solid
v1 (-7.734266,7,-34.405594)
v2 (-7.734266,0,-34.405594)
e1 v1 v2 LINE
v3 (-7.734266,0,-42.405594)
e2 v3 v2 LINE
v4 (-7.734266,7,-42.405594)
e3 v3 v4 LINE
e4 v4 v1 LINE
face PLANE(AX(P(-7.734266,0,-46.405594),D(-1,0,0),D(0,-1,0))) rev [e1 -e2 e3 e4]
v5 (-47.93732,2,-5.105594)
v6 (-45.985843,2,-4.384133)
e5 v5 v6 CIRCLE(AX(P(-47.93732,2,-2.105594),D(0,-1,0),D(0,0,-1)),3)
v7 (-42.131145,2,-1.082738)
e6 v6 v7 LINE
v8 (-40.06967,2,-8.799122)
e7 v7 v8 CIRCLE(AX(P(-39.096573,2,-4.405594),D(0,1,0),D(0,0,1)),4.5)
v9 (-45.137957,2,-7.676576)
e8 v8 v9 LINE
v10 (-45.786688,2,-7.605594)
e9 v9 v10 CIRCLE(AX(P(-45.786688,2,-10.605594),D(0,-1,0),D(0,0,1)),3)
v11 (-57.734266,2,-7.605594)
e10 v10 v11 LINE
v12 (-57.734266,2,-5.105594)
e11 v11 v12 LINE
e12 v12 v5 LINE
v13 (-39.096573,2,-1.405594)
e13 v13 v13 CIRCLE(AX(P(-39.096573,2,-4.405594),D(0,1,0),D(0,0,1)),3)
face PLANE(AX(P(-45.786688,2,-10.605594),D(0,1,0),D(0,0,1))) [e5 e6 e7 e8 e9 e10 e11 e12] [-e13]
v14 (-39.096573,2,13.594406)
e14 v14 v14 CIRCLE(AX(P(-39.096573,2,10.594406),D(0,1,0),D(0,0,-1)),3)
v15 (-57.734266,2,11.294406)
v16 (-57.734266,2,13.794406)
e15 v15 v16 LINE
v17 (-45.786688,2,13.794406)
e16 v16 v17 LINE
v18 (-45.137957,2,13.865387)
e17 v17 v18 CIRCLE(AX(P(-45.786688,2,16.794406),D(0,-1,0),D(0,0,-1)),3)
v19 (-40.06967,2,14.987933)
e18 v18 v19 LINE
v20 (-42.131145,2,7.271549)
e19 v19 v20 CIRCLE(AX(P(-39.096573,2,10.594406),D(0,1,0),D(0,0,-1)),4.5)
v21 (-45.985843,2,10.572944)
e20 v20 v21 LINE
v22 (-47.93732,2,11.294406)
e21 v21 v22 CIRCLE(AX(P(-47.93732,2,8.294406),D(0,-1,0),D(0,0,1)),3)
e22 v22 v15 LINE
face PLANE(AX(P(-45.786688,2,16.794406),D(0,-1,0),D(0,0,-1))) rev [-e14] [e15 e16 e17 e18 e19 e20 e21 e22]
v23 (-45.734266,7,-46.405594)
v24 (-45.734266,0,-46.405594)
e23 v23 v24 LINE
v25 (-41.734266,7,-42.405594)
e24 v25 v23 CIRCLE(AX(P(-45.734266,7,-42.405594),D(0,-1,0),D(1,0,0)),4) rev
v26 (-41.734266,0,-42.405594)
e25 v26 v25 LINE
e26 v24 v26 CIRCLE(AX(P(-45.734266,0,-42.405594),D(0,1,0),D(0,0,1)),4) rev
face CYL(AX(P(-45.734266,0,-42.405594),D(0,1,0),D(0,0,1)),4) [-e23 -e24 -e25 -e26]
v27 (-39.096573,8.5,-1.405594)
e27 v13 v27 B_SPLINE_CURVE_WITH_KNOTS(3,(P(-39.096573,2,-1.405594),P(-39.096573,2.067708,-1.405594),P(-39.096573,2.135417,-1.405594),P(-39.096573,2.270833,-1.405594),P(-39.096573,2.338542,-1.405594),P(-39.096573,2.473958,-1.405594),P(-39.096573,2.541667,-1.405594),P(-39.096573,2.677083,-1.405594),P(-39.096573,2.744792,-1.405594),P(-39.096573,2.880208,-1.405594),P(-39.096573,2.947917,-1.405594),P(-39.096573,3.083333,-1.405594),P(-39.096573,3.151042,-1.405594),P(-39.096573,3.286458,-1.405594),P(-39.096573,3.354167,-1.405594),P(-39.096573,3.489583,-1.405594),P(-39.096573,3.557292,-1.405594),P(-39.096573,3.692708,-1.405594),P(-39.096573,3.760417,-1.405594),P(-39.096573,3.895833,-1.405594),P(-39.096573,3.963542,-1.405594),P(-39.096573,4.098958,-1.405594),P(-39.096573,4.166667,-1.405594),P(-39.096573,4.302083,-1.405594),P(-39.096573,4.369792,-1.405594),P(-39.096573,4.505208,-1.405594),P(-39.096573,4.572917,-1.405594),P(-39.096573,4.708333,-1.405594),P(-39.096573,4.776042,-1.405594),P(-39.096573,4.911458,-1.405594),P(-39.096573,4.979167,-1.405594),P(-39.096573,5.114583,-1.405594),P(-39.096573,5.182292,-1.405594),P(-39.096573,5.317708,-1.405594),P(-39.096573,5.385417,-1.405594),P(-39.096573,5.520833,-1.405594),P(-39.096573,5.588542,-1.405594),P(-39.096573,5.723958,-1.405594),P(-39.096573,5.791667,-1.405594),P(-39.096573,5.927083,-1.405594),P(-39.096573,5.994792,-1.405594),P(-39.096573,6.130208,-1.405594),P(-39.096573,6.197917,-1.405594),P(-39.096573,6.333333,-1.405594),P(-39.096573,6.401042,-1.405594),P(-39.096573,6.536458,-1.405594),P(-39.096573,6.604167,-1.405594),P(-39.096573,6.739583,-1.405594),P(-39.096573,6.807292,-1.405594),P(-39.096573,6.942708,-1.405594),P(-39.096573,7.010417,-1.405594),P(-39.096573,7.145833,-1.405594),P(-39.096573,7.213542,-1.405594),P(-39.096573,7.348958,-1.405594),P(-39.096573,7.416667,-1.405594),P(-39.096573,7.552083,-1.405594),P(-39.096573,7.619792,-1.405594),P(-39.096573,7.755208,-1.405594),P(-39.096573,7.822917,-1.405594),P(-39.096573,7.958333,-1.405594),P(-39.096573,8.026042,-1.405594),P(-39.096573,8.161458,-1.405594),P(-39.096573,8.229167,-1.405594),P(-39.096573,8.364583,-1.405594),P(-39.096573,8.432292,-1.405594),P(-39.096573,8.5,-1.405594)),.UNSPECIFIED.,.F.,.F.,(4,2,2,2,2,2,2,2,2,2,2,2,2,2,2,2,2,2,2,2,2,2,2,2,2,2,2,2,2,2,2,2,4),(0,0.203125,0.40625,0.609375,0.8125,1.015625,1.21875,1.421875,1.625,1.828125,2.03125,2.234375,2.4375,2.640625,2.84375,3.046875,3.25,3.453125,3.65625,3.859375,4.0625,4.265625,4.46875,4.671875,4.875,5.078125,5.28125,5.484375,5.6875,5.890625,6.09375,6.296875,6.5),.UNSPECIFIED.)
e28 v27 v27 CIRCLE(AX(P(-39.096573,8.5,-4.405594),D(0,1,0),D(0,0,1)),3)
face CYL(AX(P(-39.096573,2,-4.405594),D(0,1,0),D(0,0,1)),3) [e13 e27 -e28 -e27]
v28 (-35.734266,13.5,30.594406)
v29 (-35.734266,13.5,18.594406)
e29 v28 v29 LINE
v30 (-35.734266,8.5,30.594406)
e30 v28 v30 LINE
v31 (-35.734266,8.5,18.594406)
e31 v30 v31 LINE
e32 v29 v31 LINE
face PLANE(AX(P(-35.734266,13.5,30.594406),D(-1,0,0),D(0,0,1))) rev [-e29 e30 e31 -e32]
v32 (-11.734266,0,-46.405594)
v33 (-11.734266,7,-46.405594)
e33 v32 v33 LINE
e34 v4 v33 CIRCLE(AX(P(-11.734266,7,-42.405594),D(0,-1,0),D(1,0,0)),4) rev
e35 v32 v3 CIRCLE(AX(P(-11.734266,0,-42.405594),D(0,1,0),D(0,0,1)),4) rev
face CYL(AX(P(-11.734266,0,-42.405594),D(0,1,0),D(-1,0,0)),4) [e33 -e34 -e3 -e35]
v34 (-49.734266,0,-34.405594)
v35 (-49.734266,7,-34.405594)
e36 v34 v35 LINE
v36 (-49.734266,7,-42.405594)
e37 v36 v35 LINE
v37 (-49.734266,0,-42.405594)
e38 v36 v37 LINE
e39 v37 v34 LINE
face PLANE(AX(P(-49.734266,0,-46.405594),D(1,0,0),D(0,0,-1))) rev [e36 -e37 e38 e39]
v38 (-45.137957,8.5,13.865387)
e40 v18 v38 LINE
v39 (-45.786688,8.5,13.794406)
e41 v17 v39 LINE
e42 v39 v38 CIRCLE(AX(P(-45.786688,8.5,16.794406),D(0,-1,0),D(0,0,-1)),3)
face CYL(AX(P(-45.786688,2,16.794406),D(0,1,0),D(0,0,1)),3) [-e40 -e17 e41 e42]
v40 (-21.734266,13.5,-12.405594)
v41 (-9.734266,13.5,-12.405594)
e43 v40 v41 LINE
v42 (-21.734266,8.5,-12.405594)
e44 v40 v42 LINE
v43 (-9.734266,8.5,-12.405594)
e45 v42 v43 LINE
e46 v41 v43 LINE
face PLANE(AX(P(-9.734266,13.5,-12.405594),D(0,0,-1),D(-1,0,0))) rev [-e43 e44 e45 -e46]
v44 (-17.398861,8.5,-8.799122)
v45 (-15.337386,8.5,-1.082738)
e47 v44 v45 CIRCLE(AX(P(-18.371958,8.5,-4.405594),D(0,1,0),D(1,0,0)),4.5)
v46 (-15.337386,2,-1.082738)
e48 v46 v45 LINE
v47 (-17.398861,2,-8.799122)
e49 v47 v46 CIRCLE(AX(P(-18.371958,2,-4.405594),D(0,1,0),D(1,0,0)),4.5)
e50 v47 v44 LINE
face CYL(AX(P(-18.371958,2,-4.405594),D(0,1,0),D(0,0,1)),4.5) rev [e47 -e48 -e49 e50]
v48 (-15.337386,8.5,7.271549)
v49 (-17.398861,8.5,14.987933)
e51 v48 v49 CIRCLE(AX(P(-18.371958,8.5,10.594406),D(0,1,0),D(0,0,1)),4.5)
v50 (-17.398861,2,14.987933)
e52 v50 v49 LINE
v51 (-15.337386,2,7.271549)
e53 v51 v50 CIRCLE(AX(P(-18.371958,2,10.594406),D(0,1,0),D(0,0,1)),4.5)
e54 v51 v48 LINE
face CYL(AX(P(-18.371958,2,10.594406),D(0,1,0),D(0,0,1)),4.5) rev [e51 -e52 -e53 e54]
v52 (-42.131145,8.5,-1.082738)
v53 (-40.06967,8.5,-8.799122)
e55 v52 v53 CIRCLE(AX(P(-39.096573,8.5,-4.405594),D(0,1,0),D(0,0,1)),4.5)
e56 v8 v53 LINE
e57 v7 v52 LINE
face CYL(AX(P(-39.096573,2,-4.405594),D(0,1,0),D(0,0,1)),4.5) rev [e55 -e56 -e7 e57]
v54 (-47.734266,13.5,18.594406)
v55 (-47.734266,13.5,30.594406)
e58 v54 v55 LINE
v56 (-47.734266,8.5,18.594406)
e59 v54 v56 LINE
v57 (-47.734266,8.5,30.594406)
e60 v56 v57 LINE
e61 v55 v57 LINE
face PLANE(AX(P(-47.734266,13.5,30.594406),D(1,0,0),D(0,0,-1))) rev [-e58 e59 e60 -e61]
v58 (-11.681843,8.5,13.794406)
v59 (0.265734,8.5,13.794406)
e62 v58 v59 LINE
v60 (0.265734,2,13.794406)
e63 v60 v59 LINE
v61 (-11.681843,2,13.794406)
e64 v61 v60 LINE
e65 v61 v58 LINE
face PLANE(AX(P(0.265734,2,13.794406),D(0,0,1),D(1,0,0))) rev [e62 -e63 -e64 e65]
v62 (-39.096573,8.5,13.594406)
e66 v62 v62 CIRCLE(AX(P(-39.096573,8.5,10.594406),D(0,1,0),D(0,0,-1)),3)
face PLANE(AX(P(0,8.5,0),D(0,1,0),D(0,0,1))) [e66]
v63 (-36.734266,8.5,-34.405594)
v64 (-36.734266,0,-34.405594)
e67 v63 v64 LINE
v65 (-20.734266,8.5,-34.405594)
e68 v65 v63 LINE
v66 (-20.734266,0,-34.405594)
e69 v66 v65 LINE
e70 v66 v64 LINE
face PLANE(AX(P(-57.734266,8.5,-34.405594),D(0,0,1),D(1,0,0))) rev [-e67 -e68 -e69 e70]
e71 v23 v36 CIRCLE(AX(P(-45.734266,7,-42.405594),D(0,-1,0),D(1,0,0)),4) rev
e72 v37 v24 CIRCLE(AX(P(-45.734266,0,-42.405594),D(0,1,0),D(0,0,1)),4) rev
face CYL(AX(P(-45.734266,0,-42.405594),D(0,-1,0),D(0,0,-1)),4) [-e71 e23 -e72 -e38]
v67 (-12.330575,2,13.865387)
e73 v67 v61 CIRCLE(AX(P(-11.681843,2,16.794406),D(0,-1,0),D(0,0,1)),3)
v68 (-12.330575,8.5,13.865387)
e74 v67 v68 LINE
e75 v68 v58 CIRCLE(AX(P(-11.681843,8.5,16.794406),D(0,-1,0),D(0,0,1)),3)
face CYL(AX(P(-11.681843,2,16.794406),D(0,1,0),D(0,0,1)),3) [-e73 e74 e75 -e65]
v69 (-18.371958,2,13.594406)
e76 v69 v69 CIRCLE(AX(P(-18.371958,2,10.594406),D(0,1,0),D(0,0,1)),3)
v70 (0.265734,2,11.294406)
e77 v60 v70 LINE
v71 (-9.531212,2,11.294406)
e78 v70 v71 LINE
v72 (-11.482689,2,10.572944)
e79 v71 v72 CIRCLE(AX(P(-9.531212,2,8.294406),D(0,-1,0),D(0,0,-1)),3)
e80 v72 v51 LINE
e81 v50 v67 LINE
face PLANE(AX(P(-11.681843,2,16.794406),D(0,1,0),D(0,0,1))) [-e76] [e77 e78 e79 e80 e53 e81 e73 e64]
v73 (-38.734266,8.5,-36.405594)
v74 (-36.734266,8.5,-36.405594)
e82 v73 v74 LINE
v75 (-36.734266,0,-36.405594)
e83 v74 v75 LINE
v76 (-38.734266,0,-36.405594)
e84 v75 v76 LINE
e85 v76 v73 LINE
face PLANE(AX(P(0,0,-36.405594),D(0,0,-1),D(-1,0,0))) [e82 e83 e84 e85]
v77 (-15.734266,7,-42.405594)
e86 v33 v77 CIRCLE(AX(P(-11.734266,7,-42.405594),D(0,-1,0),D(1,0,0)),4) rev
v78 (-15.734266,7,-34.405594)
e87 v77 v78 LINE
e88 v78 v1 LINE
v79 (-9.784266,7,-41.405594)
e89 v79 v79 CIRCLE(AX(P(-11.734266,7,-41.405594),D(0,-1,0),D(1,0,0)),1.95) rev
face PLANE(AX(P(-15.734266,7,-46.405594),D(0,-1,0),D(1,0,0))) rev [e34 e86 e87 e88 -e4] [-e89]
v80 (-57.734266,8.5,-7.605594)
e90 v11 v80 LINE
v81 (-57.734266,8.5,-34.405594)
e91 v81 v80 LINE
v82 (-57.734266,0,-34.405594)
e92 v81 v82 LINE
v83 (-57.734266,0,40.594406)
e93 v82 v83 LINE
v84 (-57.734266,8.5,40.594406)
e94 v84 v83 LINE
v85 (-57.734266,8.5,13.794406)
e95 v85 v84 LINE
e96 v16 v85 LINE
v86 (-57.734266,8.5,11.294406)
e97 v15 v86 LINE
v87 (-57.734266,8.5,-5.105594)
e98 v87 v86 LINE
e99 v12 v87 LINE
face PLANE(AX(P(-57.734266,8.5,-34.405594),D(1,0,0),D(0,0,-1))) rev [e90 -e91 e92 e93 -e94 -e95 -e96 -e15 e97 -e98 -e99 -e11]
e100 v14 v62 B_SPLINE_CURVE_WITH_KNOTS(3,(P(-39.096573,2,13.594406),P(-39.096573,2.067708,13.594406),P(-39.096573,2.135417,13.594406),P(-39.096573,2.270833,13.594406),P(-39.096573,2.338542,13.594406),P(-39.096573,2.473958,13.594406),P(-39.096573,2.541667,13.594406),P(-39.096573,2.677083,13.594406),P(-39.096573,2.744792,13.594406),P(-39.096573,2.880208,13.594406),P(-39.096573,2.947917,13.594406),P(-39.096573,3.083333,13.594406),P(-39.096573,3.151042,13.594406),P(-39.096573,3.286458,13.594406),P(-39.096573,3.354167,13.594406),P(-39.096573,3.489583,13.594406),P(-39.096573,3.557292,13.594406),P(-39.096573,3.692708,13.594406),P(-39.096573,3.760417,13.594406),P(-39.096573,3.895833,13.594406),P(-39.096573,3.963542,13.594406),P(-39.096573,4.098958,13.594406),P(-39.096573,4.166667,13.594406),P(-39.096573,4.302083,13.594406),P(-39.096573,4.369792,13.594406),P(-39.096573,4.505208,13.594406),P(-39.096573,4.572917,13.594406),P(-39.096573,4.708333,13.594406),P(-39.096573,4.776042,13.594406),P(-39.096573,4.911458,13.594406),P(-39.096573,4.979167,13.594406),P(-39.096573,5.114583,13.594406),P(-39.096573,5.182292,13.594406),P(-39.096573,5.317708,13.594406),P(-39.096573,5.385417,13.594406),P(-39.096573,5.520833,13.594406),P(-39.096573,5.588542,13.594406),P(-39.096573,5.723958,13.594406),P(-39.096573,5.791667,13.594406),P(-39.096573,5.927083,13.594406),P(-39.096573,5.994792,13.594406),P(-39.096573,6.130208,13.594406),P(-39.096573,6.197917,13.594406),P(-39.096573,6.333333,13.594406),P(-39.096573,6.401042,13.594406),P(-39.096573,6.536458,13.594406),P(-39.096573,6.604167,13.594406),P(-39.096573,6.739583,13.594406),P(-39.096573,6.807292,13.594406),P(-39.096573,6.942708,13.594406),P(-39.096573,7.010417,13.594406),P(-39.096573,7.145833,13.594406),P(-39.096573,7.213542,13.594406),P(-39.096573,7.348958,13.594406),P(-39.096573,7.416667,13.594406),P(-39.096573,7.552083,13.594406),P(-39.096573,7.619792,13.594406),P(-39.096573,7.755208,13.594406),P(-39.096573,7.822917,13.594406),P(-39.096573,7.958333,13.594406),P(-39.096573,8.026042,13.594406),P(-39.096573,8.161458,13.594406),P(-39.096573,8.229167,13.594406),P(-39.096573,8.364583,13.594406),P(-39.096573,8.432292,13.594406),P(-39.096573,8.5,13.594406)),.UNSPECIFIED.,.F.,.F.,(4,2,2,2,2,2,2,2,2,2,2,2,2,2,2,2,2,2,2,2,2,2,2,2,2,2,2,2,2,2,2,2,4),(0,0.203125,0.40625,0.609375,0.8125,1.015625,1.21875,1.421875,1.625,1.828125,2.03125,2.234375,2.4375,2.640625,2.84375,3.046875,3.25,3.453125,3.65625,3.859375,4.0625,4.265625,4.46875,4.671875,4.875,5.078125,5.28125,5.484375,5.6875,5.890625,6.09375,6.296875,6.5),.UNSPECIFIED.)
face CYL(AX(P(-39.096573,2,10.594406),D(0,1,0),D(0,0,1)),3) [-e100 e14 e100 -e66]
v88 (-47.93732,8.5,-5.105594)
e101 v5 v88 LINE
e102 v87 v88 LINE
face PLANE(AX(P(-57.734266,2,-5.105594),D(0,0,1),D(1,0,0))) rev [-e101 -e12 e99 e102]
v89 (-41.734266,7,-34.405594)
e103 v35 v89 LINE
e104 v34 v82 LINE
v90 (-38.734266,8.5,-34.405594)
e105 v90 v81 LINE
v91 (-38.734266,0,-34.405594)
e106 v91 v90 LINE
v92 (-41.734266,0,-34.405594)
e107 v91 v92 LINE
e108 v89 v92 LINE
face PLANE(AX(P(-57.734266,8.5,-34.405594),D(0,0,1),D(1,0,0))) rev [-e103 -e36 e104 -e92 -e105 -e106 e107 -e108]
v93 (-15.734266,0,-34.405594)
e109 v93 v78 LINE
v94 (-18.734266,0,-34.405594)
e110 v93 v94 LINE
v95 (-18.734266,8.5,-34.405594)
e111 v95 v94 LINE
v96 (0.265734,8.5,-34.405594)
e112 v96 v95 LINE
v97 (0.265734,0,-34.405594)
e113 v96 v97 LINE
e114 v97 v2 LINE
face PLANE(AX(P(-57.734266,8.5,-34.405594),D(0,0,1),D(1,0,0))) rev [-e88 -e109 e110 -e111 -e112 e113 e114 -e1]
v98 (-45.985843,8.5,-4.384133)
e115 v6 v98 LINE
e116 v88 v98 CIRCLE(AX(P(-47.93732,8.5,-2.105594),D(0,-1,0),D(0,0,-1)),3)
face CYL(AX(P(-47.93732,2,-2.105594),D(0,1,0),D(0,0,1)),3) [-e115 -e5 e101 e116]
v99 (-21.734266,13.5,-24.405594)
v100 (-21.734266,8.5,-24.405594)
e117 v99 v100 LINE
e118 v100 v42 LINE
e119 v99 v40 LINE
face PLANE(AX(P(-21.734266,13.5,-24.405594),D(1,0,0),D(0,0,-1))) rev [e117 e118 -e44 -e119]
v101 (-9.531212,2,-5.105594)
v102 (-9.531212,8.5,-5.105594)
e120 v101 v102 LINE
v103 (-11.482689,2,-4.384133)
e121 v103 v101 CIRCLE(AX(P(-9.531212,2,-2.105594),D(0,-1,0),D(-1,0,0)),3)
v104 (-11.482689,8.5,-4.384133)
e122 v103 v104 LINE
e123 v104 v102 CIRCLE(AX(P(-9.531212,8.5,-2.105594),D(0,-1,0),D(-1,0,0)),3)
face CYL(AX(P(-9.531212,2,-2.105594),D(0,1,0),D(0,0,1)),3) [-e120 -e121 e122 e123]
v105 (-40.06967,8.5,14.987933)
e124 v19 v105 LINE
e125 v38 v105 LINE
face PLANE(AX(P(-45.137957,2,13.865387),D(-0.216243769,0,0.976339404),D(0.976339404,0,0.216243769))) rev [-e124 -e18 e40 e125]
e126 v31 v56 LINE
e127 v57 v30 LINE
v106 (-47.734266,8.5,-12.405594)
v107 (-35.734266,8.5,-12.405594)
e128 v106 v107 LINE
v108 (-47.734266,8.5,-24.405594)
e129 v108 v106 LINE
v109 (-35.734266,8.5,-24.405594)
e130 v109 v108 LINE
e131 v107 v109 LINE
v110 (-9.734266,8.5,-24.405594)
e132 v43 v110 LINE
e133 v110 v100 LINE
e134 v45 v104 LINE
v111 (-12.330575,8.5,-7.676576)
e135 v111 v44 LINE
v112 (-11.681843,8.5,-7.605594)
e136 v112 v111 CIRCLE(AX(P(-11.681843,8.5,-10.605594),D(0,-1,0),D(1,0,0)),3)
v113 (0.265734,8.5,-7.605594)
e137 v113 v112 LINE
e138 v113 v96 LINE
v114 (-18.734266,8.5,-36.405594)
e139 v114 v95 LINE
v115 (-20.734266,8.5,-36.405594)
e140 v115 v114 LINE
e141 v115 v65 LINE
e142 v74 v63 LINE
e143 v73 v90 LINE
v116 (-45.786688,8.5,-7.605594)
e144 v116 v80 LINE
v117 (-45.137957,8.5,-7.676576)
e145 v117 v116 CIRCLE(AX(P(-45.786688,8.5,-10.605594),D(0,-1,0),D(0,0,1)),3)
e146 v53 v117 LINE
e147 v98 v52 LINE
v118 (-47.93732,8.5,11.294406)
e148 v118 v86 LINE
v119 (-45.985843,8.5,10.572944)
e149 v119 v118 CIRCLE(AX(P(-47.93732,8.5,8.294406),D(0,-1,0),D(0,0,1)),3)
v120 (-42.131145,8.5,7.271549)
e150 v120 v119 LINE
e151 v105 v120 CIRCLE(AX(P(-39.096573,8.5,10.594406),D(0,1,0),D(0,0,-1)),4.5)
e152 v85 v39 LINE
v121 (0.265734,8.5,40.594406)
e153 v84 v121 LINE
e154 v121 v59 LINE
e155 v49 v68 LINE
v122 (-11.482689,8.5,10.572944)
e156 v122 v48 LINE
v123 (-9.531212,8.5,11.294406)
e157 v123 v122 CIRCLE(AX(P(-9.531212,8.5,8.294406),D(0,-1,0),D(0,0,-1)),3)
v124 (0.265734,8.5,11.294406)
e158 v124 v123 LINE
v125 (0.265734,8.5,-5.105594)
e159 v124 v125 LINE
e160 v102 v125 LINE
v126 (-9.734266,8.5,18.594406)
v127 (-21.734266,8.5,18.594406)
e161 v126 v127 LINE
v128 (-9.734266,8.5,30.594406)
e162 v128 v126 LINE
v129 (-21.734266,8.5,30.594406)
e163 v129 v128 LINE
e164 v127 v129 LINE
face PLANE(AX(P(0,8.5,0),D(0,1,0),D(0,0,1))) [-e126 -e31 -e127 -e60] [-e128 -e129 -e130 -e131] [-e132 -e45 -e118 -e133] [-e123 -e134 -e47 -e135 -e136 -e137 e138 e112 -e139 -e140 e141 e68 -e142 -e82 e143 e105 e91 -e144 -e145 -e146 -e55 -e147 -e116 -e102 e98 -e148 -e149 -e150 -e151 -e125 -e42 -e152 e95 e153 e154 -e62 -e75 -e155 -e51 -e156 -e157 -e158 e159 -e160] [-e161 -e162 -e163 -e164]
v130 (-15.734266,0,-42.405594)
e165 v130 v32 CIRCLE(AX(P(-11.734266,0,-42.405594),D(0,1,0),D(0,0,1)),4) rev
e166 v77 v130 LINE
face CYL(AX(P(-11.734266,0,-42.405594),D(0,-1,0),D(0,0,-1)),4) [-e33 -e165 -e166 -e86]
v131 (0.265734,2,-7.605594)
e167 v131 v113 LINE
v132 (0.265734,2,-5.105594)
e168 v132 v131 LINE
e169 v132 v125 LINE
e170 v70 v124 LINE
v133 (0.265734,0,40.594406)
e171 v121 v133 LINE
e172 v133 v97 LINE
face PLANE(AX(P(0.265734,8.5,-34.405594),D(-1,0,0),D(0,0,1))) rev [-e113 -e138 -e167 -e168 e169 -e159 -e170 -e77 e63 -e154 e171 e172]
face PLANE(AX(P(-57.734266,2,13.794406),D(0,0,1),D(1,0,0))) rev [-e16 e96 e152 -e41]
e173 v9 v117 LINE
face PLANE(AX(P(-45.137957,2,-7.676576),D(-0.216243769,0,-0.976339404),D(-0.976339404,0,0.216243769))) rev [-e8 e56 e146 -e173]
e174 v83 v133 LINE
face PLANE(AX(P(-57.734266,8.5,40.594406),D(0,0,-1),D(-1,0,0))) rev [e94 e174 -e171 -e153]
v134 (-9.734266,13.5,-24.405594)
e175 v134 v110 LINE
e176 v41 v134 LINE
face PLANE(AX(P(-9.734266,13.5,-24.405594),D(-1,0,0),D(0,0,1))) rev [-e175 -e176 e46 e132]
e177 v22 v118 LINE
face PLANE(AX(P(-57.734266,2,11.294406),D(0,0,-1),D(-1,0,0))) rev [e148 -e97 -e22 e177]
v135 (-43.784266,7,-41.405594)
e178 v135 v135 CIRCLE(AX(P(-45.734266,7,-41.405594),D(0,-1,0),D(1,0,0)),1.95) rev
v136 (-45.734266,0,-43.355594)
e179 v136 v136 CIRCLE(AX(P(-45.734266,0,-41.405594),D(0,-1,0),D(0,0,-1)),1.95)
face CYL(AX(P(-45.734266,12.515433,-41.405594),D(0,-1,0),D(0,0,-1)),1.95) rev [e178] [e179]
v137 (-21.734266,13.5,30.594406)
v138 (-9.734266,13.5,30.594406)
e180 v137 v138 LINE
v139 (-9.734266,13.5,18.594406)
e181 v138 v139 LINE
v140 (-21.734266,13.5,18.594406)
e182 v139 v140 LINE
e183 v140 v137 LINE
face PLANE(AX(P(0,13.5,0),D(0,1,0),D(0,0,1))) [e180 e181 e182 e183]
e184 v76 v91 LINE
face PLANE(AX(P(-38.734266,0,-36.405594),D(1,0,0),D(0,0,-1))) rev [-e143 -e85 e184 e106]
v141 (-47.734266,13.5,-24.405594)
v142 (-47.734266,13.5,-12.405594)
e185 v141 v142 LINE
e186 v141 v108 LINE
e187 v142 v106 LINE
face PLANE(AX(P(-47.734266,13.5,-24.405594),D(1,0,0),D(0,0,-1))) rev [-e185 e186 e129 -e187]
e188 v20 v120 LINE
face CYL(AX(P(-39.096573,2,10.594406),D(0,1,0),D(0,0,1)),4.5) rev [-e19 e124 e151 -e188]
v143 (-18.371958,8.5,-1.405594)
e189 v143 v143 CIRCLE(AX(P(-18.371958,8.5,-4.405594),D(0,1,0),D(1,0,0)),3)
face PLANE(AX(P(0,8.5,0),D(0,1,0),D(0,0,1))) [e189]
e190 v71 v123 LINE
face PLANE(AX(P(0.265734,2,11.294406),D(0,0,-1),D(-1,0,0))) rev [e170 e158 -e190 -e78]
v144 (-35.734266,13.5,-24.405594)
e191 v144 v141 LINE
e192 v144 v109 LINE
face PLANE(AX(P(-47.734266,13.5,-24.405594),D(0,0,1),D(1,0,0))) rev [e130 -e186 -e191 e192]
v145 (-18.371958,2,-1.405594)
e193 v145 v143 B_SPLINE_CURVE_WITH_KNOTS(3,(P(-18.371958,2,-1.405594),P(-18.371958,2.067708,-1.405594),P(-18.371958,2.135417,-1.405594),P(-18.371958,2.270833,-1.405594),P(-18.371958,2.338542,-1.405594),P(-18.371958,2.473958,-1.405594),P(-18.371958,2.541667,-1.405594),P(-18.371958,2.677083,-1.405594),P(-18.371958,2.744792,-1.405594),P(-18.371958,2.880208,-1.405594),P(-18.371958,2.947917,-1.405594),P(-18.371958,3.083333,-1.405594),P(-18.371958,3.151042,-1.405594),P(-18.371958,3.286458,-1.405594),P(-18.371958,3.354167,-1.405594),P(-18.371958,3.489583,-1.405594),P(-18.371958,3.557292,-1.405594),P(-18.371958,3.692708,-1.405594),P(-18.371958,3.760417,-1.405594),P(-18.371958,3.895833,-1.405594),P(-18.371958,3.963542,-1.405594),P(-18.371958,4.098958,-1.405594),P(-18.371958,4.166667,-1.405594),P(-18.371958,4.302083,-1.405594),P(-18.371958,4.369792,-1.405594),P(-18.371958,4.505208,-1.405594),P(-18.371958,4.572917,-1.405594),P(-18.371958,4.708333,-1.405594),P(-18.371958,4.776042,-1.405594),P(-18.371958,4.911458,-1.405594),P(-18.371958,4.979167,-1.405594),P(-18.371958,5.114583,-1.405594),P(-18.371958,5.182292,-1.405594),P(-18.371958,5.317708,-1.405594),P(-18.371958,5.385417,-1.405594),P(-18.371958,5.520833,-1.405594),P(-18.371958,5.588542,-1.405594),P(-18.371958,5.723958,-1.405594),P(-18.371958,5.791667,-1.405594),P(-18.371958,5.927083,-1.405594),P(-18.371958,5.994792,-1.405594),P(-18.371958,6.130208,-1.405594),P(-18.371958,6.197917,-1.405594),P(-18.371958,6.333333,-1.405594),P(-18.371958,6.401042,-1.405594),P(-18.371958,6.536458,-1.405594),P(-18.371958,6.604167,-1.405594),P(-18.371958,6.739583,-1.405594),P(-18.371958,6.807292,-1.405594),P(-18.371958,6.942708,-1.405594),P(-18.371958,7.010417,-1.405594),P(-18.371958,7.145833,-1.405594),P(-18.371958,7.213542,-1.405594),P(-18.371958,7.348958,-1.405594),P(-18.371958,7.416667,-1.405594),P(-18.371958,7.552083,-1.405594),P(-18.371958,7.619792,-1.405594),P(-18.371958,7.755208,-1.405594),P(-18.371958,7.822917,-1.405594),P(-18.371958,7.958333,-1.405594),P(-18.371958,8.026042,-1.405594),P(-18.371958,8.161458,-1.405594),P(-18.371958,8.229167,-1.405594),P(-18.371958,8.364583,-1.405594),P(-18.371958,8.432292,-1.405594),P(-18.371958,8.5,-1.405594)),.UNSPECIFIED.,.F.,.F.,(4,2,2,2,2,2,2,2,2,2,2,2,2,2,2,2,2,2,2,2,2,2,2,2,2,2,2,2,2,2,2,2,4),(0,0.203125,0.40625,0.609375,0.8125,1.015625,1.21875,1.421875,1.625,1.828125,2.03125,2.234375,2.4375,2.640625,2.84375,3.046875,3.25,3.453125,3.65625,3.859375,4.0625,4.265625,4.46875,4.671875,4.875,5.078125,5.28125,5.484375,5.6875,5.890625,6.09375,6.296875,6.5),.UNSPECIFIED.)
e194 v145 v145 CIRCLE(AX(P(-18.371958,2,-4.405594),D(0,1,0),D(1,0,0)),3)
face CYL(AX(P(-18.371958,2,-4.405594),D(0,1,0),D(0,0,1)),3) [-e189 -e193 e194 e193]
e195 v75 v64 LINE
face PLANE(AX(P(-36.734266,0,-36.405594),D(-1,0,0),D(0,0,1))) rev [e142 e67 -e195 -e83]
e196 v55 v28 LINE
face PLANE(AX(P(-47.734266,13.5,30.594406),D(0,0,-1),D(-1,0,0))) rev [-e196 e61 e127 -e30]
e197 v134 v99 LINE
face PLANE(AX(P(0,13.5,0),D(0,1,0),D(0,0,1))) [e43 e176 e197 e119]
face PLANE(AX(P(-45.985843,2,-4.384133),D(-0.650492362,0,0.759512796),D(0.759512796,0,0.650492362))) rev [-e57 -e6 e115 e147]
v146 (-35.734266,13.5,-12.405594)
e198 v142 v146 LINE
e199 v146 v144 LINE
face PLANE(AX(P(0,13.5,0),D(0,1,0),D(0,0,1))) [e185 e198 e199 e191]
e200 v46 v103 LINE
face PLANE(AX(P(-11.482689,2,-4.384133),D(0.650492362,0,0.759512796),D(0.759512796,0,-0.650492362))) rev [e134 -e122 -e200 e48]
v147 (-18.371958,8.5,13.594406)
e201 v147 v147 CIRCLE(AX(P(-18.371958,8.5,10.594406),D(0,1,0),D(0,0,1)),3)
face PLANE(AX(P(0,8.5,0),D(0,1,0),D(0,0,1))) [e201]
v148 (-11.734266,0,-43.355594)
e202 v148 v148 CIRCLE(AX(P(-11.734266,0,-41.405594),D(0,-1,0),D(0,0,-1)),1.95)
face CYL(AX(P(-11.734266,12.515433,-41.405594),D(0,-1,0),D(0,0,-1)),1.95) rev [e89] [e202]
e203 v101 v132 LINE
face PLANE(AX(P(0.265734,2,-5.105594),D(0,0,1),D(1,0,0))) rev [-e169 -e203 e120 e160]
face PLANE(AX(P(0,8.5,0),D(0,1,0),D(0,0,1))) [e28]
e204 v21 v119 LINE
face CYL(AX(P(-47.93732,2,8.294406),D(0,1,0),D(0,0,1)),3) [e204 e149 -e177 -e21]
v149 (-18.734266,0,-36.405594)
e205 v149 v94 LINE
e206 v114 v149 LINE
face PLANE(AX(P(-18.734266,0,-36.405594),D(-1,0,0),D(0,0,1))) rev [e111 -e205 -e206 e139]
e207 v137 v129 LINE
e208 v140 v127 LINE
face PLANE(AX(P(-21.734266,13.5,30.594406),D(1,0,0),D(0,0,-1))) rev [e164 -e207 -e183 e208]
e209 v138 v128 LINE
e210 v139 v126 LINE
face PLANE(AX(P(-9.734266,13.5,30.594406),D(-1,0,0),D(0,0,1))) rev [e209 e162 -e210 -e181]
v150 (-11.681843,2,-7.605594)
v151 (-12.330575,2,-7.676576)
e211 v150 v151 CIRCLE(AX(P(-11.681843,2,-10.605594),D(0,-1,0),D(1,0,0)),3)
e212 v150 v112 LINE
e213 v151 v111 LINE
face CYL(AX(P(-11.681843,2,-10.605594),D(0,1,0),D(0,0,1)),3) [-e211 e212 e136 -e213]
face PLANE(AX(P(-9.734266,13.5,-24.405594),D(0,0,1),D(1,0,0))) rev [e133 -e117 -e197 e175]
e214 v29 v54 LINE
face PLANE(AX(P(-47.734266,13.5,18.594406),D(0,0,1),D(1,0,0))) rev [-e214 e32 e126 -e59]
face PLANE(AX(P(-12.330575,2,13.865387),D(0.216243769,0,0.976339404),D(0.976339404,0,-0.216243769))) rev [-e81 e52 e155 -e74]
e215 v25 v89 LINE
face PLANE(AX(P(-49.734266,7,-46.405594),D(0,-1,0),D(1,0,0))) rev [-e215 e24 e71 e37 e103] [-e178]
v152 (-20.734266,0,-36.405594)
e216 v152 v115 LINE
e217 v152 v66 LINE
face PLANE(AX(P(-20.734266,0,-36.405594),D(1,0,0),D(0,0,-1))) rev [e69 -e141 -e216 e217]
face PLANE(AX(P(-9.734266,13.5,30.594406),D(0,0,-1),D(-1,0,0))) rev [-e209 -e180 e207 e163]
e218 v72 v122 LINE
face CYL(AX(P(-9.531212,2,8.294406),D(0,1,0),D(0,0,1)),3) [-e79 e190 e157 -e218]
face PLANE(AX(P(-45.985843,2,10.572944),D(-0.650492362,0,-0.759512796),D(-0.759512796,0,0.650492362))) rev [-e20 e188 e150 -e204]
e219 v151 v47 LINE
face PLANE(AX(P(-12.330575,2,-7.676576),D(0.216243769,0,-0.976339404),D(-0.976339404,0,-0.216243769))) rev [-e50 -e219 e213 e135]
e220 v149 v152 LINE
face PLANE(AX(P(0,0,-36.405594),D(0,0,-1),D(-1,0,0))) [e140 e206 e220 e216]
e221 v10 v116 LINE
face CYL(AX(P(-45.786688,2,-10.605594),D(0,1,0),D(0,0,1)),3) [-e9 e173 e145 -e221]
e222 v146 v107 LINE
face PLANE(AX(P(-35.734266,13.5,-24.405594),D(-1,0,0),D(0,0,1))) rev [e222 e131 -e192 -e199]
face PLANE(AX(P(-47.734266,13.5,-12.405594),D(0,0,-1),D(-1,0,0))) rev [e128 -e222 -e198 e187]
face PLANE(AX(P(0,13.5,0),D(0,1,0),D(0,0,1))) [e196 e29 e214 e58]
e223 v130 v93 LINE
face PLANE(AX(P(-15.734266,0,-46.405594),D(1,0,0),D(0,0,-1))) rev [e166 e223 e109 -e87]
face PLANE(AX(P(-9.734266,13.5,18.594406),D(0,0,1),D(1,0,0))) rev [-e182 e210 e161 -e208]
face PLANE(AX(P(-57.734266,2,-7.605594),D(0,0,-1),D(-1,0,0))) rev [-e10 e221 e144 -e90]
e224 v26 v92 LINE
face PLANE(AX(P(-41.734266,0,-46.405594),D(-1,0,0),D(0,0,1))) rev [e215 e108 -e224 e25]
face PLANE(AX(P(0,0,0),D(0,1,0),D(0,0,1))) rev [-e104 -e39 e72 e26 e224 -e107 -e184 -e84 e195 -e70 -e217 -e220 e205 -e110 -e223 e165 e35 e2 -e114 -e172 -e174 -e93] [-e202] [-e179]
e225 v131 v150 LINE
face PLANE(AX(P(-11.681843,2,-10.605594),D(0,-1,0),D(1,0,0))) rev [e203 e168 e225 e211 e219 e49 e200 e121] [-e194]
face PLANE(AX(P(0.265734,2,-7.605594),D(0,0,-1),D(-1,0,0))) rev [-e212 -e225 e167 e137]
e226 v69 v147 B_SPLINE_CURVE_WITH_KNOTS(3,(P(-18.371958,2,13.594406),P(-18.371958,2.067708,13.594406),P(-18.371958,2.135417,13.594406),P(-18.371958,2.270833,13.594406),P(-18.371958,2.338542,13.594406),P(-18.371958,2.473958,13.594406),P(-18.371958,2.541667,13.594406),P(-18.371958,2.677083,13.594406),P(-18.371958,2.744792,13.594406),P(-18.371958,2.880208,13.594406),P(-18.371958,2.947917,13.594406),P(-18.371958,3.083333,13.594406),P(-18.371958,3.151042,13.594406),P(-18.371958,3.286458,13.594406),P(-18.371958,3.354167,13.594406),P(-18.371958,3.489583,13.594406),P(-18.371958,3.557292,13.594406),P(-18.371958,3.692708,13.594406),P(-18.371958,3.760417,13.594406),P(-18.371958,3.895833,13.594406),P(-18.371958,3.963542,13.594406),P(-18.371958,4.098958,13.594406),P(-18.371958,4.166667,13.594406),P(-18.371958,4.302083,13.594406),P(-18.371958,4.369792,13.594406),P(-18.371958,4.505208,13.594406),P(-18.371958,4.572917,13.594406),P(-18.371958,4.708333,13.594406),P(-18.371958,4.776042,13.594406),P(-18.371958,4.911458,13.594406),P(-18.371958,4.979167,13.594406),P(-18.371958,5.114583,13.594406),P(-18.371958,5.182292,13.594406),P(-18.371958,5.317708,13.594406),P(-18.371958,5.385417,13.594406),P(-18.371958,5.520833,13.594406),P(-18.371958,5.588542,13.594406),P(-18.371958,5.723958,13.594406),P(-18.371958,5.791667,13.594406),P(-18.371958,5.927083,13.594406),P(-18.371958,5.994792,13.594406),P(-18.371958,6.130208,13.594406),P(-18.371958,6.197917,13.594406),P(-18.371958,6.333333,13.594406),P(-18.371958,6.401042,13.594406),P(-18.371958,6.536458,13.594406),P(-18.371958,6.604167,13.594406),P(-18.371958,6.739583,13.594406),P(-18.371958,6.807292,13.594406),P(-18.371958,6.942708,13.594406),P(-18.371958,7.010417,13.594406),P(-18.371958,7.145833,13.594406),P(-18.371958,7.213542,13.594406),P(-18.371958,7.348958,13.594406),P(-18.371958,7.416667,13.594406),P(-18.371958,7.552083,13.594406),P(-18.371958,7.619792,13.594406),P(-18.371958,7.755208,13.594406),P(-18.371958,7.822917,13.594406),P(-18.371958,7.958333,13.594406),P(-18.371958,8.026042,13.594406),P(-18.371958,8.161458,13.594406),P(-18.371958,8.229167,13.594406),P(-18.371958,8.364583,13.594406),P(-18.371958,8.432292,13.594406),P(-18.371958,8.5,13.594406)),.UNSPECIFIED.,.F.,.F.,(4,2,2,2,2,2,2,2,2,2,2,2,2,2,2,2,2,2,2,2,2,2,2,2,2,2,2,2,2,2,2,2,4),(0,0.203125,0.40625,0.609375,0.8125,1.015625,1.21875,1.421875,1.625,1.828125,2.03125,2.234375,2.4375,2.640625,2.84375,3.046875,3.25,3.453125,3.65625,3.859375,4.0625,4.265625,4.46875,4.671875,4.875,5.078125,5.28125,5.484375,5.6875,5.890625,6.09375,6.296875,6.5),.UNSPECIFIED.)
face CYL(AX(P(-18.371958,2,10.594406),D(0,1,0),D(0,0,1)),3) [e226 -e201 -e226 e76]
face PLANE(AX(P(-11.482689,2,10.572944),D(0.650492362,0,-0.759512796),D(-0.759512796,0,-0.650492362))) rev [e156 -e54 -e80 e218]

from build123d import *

# Parameters (mm, degrees)
SKETCH1_W           = 58
SKETCH1_H           = 75
BOSS_EXTRUDE1_DEPTH = 8.5
SKETCH4_R           = 3
CUT_EXTRUDE1_DEPTH  = 6.5
SKETCH5_W           = 12
SKETCH5_H           = 12
BOSS_EXTRUDE2_DEPTH = 5
SKETCH8_W           = 2
SKETCH8_H           = 8.5
BOSS_EXTRUDE3_DEPTH = 2
SKETCH7_W           = 8
SKETCH7_H           = 7
BOSS_EXTRUDE4_DEPTH = 12
SKETCH9_R           = 1.95
CUT_EXTRUDE2_DEPTH  = 7
FILLET1_R           = 4


with BuildPart() as part:
    # Sketch1 → Boss-Extrude1 (new body)
    with BuildSketch(Plane(origin=(0, 0, 0), x_dir=(1, 0, 0), z_dir=(0, 1, 0))):
        with Locations((-28.734265734, -3.094405594)):
            Rectangle(SKETCH1_W, SKETCH1_H)
    extrude(amount=BOSS_EXTRUDE1_DEPTH)

    # Sketch4 → Cut-Extrude1 (cut)
    # profile 1 of 4: a face of its own
    with BuildSketch(Plane(origin=(0, 8.5, 0), x_dir=(1, 0, 0), z_dir=(0, 1, 0))):
        with BuildLine():
            Line((-57.734265734, 7.605594406), (-57.734265734, 5.105594406))
            Line((-57.734265734, 5.105594406), (-47.937319909, 5.105594406))
            ThreePointArc((-47.937319909, 5.105594406), (-46.897035131, 4.919454313), (-45.985842823, 4.384132793))
            Line((-45.985842823, 4.384132793), (-42.13114507, 1.082738189))
            ThreePointArc((-42.13114507, 1.082738189), (-34.749045592, 3.244128144), (-40.069670138, 8.799121725))
            Line((-40.069670138, 8.799121725), (-45.137956932, 7.676576192))
            ThreePointArc((-45.137956932, 7.676576192), (-45.46038672, 7.623392649), (-45.786688237, 7.605594406))
            Line((-45.786688237, 7.605594406), (-57.734265734, 7.605594406))
        make_face()
        with Locations(Location((-39.096573179, 4.405594406, 0), (0, 0, 270))):
            Circle(SKETCH4_R, mode=Mode.SUBTRACT)
    # profile 2 of 4: a face of its own
    with BuildSketch(Plane(origin=(0, 8.5, 0), x_dir=(1, 0, 0), z_dir=(0, 1, 0))):
        with BuildLine():
            Line((-57.734265734, -13.794405594), (-57.734265734, -11.294405594))
            Line((-57.734265734, -11.294405594), (-47.937319909, -11.294405594))
            ThreePointArc((-47.937319909, -11.294405594), (-46.897035131, -11.108265502), (-45.985842823, -10.572943982))
            Line((-45.985842823, -10.572943982), (-42.13114507, -7.271549377))
            ThreePointArc((-42.13114507, -7.271549377), (-34.749045592, -9.432939333), (-40.069670138, -14.987932914))
            Line((-40.069670138, -14.987932914), (-45.137956932, -13.865387381))
            ThreePointArc((-45.137956932, -13.865387381), (-45.46038672, -13.812203837), (-45.786688237, -13.794405594))
            Line((-45.786688237, -13.794405594), (-57.734265734, -13.794405594))
        make_face()
        with Locations(Location((-39.096573179, -10.594405594, 0), (0, 0, 270))):
            Circle(SKETCH4_R, mode=Mode.SUBTRACT)
    # profile 3 of 4: a face of its own
    with BuildSketch(Plane(origin=(0, 8.5, 0), x_dir=(1, 0, 0), z_dir=(0, 1, 0))):
        with BuildLine():
            Line((0.265734266, -13.794405594), (0.265734266, -11.294405594))
            Line((0.265734266, -11.294405594), (-9.531211559, -11.294405594))
            ThreePointArc((-9.531211559, -11.294405594), (-10.571496337, -11.108265502), (-11.482688645, -10.572943982))
            Line((-11.482688645, -10.572943982), (-15.337386398, -7.271549377))
            ThreePointArc((-15.337386398, -7.271549377), (-22.719485877, -9.432939333), (-17.39886133, -14.987932914))
            Line((-17.39886133, -14.987932914), (-12.330574537, -13.865387381))
            ThreePointArc((-12.330574537, -13.865387381), (-12.008144749, -13.812203837), (-11.681843231, -13.794405594))
            Line((-11.681843231, -13.794405594), (0.265734266, -13.794405594))
        make_face()
        with Locations(Location((-18.371958289, -10.594405594, 0), (0, 0, 270))):
            Circle(SKETCH4_R, mode=Mode.SUBTRACT)
    # profile 4 of 4: a face of its own
    with BuildSketch(Plane(origin=(0, 8.5, 0), x_dir=(1, 0, 0), z_dir=(0, 1, 0))):
        with BuildLine():
            Line((0.265734266, 7.605594406), (0.265734266, 5.105594406))
            Line((0.265734266, 5.105594406), (-9.531211559, 5.105594406))
            ThreePointArc((-9.531211559, 5.105594406), (-10.571496337, 4.919454313), (-11.482688645, 4.384132793))
            Line((-11.482688645, 4.384132793), (-15.337386398, 1.082738189))
            ThreePointArc((-15.337386398, 1.082738189), (-22.719485877, 3.244128144), (-17.39886133, 8.799121725))
            Line((-17.39886133, 8.799121725), (-12.330574537, 7.676576192))
            ThreePointArc((-12.330574537, 7.676576192), (-12.008144749, 7.623392649), (-11.681843231, 7.605594406))
            Line((-11.681843231, 7.605594406), (0.265734266, 7.605594406))
        make_face()
        with Locations(Location((-18.371958289, 4.405594406, 0), (0, 0, 270))):
            Circle(SKETCH4_R, mode=Mode.SUBTRACT)
    extrude(amount=-CUT_EXTRUDE1_DEPTH, mode=Mode.SUBTRACT)

    # Sketch5 → Boss-Extrude2 (add)
    with BuildSketch(Plane(origin=(0, 8.5, 0), x_dir=(1, 0, 0), z_dir=(0, 1, 0))):
        with Locations((-41.734265734, 18.405594406)):
            Rectangle(SKETCH5_W, SKETCH5_H)
        with Locations((-15.734265734, 18.405594406)):
            Rectangle(SKETCH5_W, SKETCH5_H)
        with Locations((-15.734265734, -24.594405594)):
            Rectangle(SKETCH5_W, SKETCH5_H)
        with Locations((-41.734265734, -24.594405594)):
            Rectangle(SKETCH5_W, SKETCH5_H)
    extrude(amount=BOSS_EXTRUDE2_DEPTH)

    # Sketch8 → Boss-Extrude3 (add)
    with BuildSketch(Plane(origin=(0, 0, -34.405594406), x_dir=(-1, 0, 0), z_dir=(0, 0, -1))):
        with Locations((37.734265734, 4.25)):
            Rectangle(SKETCH8_W, SKETCH8_H)
        with Locations((19.734265734, 4.25)):
            Rectangle(SKETCH8_W, SKETCH8_H)
    extrude(amount=BOSS_EXTRUDE3_DEPTH)

    # Sketch7 → Boss-Extrude4 (add)
    with BuildSketch(Plane(origin=(0, 0, -34.405594406), x_dir=(-1, 0, 0), z_dir=(0, 0, -1))):
        with Locations((45.734265734, 3.5)):
            Rectangle(SKETCH7_W, SKETCH7_H)
        with Locations((11.734265734, 3.5)):
            Rectangle(SKETCH7_W, SKETCH7_H)
    extrude(amount=BOSS_EXTRUDE4_DEPTH)

    # Sketch9 → Cut-Extrude2 (cut)
    with BuildSketch(Plane(origin=(0, 0, 0), x_dir=(-1, 0, 0), z_dir=(0, -1, 0))):
        with Locations(Location((11.734265734, 41.405594406, 0), (0, 0, 90))):
            Circle(SKETCH9_R)
        with Locations(Location((45.734265734, 41.405594406, 0), (0, 0, 90))):
            Circle(SKETCH9_R)
    extrude(amount=-CUT_EXTRUDE2_DEPTH, mode=Mode.SUBTRACT)

    # Fillet1
    fillet1_edges = [part.edges().sort_by_distance(p)[0] for p in [
        (-7.734265734, 3.5, -46.405594406),
        (-15.734265734, 3.5, -46.405594406),
        (-49.734265734, 3.5, -46.405594406),
        (-41.734265734, 3.5, -46.405594406),
    ]]
    fillet(fillet1_edges, radius=FILLET1_R - 0.0001)  # a hair under: the kernel refuses the full size


solid = part.part
